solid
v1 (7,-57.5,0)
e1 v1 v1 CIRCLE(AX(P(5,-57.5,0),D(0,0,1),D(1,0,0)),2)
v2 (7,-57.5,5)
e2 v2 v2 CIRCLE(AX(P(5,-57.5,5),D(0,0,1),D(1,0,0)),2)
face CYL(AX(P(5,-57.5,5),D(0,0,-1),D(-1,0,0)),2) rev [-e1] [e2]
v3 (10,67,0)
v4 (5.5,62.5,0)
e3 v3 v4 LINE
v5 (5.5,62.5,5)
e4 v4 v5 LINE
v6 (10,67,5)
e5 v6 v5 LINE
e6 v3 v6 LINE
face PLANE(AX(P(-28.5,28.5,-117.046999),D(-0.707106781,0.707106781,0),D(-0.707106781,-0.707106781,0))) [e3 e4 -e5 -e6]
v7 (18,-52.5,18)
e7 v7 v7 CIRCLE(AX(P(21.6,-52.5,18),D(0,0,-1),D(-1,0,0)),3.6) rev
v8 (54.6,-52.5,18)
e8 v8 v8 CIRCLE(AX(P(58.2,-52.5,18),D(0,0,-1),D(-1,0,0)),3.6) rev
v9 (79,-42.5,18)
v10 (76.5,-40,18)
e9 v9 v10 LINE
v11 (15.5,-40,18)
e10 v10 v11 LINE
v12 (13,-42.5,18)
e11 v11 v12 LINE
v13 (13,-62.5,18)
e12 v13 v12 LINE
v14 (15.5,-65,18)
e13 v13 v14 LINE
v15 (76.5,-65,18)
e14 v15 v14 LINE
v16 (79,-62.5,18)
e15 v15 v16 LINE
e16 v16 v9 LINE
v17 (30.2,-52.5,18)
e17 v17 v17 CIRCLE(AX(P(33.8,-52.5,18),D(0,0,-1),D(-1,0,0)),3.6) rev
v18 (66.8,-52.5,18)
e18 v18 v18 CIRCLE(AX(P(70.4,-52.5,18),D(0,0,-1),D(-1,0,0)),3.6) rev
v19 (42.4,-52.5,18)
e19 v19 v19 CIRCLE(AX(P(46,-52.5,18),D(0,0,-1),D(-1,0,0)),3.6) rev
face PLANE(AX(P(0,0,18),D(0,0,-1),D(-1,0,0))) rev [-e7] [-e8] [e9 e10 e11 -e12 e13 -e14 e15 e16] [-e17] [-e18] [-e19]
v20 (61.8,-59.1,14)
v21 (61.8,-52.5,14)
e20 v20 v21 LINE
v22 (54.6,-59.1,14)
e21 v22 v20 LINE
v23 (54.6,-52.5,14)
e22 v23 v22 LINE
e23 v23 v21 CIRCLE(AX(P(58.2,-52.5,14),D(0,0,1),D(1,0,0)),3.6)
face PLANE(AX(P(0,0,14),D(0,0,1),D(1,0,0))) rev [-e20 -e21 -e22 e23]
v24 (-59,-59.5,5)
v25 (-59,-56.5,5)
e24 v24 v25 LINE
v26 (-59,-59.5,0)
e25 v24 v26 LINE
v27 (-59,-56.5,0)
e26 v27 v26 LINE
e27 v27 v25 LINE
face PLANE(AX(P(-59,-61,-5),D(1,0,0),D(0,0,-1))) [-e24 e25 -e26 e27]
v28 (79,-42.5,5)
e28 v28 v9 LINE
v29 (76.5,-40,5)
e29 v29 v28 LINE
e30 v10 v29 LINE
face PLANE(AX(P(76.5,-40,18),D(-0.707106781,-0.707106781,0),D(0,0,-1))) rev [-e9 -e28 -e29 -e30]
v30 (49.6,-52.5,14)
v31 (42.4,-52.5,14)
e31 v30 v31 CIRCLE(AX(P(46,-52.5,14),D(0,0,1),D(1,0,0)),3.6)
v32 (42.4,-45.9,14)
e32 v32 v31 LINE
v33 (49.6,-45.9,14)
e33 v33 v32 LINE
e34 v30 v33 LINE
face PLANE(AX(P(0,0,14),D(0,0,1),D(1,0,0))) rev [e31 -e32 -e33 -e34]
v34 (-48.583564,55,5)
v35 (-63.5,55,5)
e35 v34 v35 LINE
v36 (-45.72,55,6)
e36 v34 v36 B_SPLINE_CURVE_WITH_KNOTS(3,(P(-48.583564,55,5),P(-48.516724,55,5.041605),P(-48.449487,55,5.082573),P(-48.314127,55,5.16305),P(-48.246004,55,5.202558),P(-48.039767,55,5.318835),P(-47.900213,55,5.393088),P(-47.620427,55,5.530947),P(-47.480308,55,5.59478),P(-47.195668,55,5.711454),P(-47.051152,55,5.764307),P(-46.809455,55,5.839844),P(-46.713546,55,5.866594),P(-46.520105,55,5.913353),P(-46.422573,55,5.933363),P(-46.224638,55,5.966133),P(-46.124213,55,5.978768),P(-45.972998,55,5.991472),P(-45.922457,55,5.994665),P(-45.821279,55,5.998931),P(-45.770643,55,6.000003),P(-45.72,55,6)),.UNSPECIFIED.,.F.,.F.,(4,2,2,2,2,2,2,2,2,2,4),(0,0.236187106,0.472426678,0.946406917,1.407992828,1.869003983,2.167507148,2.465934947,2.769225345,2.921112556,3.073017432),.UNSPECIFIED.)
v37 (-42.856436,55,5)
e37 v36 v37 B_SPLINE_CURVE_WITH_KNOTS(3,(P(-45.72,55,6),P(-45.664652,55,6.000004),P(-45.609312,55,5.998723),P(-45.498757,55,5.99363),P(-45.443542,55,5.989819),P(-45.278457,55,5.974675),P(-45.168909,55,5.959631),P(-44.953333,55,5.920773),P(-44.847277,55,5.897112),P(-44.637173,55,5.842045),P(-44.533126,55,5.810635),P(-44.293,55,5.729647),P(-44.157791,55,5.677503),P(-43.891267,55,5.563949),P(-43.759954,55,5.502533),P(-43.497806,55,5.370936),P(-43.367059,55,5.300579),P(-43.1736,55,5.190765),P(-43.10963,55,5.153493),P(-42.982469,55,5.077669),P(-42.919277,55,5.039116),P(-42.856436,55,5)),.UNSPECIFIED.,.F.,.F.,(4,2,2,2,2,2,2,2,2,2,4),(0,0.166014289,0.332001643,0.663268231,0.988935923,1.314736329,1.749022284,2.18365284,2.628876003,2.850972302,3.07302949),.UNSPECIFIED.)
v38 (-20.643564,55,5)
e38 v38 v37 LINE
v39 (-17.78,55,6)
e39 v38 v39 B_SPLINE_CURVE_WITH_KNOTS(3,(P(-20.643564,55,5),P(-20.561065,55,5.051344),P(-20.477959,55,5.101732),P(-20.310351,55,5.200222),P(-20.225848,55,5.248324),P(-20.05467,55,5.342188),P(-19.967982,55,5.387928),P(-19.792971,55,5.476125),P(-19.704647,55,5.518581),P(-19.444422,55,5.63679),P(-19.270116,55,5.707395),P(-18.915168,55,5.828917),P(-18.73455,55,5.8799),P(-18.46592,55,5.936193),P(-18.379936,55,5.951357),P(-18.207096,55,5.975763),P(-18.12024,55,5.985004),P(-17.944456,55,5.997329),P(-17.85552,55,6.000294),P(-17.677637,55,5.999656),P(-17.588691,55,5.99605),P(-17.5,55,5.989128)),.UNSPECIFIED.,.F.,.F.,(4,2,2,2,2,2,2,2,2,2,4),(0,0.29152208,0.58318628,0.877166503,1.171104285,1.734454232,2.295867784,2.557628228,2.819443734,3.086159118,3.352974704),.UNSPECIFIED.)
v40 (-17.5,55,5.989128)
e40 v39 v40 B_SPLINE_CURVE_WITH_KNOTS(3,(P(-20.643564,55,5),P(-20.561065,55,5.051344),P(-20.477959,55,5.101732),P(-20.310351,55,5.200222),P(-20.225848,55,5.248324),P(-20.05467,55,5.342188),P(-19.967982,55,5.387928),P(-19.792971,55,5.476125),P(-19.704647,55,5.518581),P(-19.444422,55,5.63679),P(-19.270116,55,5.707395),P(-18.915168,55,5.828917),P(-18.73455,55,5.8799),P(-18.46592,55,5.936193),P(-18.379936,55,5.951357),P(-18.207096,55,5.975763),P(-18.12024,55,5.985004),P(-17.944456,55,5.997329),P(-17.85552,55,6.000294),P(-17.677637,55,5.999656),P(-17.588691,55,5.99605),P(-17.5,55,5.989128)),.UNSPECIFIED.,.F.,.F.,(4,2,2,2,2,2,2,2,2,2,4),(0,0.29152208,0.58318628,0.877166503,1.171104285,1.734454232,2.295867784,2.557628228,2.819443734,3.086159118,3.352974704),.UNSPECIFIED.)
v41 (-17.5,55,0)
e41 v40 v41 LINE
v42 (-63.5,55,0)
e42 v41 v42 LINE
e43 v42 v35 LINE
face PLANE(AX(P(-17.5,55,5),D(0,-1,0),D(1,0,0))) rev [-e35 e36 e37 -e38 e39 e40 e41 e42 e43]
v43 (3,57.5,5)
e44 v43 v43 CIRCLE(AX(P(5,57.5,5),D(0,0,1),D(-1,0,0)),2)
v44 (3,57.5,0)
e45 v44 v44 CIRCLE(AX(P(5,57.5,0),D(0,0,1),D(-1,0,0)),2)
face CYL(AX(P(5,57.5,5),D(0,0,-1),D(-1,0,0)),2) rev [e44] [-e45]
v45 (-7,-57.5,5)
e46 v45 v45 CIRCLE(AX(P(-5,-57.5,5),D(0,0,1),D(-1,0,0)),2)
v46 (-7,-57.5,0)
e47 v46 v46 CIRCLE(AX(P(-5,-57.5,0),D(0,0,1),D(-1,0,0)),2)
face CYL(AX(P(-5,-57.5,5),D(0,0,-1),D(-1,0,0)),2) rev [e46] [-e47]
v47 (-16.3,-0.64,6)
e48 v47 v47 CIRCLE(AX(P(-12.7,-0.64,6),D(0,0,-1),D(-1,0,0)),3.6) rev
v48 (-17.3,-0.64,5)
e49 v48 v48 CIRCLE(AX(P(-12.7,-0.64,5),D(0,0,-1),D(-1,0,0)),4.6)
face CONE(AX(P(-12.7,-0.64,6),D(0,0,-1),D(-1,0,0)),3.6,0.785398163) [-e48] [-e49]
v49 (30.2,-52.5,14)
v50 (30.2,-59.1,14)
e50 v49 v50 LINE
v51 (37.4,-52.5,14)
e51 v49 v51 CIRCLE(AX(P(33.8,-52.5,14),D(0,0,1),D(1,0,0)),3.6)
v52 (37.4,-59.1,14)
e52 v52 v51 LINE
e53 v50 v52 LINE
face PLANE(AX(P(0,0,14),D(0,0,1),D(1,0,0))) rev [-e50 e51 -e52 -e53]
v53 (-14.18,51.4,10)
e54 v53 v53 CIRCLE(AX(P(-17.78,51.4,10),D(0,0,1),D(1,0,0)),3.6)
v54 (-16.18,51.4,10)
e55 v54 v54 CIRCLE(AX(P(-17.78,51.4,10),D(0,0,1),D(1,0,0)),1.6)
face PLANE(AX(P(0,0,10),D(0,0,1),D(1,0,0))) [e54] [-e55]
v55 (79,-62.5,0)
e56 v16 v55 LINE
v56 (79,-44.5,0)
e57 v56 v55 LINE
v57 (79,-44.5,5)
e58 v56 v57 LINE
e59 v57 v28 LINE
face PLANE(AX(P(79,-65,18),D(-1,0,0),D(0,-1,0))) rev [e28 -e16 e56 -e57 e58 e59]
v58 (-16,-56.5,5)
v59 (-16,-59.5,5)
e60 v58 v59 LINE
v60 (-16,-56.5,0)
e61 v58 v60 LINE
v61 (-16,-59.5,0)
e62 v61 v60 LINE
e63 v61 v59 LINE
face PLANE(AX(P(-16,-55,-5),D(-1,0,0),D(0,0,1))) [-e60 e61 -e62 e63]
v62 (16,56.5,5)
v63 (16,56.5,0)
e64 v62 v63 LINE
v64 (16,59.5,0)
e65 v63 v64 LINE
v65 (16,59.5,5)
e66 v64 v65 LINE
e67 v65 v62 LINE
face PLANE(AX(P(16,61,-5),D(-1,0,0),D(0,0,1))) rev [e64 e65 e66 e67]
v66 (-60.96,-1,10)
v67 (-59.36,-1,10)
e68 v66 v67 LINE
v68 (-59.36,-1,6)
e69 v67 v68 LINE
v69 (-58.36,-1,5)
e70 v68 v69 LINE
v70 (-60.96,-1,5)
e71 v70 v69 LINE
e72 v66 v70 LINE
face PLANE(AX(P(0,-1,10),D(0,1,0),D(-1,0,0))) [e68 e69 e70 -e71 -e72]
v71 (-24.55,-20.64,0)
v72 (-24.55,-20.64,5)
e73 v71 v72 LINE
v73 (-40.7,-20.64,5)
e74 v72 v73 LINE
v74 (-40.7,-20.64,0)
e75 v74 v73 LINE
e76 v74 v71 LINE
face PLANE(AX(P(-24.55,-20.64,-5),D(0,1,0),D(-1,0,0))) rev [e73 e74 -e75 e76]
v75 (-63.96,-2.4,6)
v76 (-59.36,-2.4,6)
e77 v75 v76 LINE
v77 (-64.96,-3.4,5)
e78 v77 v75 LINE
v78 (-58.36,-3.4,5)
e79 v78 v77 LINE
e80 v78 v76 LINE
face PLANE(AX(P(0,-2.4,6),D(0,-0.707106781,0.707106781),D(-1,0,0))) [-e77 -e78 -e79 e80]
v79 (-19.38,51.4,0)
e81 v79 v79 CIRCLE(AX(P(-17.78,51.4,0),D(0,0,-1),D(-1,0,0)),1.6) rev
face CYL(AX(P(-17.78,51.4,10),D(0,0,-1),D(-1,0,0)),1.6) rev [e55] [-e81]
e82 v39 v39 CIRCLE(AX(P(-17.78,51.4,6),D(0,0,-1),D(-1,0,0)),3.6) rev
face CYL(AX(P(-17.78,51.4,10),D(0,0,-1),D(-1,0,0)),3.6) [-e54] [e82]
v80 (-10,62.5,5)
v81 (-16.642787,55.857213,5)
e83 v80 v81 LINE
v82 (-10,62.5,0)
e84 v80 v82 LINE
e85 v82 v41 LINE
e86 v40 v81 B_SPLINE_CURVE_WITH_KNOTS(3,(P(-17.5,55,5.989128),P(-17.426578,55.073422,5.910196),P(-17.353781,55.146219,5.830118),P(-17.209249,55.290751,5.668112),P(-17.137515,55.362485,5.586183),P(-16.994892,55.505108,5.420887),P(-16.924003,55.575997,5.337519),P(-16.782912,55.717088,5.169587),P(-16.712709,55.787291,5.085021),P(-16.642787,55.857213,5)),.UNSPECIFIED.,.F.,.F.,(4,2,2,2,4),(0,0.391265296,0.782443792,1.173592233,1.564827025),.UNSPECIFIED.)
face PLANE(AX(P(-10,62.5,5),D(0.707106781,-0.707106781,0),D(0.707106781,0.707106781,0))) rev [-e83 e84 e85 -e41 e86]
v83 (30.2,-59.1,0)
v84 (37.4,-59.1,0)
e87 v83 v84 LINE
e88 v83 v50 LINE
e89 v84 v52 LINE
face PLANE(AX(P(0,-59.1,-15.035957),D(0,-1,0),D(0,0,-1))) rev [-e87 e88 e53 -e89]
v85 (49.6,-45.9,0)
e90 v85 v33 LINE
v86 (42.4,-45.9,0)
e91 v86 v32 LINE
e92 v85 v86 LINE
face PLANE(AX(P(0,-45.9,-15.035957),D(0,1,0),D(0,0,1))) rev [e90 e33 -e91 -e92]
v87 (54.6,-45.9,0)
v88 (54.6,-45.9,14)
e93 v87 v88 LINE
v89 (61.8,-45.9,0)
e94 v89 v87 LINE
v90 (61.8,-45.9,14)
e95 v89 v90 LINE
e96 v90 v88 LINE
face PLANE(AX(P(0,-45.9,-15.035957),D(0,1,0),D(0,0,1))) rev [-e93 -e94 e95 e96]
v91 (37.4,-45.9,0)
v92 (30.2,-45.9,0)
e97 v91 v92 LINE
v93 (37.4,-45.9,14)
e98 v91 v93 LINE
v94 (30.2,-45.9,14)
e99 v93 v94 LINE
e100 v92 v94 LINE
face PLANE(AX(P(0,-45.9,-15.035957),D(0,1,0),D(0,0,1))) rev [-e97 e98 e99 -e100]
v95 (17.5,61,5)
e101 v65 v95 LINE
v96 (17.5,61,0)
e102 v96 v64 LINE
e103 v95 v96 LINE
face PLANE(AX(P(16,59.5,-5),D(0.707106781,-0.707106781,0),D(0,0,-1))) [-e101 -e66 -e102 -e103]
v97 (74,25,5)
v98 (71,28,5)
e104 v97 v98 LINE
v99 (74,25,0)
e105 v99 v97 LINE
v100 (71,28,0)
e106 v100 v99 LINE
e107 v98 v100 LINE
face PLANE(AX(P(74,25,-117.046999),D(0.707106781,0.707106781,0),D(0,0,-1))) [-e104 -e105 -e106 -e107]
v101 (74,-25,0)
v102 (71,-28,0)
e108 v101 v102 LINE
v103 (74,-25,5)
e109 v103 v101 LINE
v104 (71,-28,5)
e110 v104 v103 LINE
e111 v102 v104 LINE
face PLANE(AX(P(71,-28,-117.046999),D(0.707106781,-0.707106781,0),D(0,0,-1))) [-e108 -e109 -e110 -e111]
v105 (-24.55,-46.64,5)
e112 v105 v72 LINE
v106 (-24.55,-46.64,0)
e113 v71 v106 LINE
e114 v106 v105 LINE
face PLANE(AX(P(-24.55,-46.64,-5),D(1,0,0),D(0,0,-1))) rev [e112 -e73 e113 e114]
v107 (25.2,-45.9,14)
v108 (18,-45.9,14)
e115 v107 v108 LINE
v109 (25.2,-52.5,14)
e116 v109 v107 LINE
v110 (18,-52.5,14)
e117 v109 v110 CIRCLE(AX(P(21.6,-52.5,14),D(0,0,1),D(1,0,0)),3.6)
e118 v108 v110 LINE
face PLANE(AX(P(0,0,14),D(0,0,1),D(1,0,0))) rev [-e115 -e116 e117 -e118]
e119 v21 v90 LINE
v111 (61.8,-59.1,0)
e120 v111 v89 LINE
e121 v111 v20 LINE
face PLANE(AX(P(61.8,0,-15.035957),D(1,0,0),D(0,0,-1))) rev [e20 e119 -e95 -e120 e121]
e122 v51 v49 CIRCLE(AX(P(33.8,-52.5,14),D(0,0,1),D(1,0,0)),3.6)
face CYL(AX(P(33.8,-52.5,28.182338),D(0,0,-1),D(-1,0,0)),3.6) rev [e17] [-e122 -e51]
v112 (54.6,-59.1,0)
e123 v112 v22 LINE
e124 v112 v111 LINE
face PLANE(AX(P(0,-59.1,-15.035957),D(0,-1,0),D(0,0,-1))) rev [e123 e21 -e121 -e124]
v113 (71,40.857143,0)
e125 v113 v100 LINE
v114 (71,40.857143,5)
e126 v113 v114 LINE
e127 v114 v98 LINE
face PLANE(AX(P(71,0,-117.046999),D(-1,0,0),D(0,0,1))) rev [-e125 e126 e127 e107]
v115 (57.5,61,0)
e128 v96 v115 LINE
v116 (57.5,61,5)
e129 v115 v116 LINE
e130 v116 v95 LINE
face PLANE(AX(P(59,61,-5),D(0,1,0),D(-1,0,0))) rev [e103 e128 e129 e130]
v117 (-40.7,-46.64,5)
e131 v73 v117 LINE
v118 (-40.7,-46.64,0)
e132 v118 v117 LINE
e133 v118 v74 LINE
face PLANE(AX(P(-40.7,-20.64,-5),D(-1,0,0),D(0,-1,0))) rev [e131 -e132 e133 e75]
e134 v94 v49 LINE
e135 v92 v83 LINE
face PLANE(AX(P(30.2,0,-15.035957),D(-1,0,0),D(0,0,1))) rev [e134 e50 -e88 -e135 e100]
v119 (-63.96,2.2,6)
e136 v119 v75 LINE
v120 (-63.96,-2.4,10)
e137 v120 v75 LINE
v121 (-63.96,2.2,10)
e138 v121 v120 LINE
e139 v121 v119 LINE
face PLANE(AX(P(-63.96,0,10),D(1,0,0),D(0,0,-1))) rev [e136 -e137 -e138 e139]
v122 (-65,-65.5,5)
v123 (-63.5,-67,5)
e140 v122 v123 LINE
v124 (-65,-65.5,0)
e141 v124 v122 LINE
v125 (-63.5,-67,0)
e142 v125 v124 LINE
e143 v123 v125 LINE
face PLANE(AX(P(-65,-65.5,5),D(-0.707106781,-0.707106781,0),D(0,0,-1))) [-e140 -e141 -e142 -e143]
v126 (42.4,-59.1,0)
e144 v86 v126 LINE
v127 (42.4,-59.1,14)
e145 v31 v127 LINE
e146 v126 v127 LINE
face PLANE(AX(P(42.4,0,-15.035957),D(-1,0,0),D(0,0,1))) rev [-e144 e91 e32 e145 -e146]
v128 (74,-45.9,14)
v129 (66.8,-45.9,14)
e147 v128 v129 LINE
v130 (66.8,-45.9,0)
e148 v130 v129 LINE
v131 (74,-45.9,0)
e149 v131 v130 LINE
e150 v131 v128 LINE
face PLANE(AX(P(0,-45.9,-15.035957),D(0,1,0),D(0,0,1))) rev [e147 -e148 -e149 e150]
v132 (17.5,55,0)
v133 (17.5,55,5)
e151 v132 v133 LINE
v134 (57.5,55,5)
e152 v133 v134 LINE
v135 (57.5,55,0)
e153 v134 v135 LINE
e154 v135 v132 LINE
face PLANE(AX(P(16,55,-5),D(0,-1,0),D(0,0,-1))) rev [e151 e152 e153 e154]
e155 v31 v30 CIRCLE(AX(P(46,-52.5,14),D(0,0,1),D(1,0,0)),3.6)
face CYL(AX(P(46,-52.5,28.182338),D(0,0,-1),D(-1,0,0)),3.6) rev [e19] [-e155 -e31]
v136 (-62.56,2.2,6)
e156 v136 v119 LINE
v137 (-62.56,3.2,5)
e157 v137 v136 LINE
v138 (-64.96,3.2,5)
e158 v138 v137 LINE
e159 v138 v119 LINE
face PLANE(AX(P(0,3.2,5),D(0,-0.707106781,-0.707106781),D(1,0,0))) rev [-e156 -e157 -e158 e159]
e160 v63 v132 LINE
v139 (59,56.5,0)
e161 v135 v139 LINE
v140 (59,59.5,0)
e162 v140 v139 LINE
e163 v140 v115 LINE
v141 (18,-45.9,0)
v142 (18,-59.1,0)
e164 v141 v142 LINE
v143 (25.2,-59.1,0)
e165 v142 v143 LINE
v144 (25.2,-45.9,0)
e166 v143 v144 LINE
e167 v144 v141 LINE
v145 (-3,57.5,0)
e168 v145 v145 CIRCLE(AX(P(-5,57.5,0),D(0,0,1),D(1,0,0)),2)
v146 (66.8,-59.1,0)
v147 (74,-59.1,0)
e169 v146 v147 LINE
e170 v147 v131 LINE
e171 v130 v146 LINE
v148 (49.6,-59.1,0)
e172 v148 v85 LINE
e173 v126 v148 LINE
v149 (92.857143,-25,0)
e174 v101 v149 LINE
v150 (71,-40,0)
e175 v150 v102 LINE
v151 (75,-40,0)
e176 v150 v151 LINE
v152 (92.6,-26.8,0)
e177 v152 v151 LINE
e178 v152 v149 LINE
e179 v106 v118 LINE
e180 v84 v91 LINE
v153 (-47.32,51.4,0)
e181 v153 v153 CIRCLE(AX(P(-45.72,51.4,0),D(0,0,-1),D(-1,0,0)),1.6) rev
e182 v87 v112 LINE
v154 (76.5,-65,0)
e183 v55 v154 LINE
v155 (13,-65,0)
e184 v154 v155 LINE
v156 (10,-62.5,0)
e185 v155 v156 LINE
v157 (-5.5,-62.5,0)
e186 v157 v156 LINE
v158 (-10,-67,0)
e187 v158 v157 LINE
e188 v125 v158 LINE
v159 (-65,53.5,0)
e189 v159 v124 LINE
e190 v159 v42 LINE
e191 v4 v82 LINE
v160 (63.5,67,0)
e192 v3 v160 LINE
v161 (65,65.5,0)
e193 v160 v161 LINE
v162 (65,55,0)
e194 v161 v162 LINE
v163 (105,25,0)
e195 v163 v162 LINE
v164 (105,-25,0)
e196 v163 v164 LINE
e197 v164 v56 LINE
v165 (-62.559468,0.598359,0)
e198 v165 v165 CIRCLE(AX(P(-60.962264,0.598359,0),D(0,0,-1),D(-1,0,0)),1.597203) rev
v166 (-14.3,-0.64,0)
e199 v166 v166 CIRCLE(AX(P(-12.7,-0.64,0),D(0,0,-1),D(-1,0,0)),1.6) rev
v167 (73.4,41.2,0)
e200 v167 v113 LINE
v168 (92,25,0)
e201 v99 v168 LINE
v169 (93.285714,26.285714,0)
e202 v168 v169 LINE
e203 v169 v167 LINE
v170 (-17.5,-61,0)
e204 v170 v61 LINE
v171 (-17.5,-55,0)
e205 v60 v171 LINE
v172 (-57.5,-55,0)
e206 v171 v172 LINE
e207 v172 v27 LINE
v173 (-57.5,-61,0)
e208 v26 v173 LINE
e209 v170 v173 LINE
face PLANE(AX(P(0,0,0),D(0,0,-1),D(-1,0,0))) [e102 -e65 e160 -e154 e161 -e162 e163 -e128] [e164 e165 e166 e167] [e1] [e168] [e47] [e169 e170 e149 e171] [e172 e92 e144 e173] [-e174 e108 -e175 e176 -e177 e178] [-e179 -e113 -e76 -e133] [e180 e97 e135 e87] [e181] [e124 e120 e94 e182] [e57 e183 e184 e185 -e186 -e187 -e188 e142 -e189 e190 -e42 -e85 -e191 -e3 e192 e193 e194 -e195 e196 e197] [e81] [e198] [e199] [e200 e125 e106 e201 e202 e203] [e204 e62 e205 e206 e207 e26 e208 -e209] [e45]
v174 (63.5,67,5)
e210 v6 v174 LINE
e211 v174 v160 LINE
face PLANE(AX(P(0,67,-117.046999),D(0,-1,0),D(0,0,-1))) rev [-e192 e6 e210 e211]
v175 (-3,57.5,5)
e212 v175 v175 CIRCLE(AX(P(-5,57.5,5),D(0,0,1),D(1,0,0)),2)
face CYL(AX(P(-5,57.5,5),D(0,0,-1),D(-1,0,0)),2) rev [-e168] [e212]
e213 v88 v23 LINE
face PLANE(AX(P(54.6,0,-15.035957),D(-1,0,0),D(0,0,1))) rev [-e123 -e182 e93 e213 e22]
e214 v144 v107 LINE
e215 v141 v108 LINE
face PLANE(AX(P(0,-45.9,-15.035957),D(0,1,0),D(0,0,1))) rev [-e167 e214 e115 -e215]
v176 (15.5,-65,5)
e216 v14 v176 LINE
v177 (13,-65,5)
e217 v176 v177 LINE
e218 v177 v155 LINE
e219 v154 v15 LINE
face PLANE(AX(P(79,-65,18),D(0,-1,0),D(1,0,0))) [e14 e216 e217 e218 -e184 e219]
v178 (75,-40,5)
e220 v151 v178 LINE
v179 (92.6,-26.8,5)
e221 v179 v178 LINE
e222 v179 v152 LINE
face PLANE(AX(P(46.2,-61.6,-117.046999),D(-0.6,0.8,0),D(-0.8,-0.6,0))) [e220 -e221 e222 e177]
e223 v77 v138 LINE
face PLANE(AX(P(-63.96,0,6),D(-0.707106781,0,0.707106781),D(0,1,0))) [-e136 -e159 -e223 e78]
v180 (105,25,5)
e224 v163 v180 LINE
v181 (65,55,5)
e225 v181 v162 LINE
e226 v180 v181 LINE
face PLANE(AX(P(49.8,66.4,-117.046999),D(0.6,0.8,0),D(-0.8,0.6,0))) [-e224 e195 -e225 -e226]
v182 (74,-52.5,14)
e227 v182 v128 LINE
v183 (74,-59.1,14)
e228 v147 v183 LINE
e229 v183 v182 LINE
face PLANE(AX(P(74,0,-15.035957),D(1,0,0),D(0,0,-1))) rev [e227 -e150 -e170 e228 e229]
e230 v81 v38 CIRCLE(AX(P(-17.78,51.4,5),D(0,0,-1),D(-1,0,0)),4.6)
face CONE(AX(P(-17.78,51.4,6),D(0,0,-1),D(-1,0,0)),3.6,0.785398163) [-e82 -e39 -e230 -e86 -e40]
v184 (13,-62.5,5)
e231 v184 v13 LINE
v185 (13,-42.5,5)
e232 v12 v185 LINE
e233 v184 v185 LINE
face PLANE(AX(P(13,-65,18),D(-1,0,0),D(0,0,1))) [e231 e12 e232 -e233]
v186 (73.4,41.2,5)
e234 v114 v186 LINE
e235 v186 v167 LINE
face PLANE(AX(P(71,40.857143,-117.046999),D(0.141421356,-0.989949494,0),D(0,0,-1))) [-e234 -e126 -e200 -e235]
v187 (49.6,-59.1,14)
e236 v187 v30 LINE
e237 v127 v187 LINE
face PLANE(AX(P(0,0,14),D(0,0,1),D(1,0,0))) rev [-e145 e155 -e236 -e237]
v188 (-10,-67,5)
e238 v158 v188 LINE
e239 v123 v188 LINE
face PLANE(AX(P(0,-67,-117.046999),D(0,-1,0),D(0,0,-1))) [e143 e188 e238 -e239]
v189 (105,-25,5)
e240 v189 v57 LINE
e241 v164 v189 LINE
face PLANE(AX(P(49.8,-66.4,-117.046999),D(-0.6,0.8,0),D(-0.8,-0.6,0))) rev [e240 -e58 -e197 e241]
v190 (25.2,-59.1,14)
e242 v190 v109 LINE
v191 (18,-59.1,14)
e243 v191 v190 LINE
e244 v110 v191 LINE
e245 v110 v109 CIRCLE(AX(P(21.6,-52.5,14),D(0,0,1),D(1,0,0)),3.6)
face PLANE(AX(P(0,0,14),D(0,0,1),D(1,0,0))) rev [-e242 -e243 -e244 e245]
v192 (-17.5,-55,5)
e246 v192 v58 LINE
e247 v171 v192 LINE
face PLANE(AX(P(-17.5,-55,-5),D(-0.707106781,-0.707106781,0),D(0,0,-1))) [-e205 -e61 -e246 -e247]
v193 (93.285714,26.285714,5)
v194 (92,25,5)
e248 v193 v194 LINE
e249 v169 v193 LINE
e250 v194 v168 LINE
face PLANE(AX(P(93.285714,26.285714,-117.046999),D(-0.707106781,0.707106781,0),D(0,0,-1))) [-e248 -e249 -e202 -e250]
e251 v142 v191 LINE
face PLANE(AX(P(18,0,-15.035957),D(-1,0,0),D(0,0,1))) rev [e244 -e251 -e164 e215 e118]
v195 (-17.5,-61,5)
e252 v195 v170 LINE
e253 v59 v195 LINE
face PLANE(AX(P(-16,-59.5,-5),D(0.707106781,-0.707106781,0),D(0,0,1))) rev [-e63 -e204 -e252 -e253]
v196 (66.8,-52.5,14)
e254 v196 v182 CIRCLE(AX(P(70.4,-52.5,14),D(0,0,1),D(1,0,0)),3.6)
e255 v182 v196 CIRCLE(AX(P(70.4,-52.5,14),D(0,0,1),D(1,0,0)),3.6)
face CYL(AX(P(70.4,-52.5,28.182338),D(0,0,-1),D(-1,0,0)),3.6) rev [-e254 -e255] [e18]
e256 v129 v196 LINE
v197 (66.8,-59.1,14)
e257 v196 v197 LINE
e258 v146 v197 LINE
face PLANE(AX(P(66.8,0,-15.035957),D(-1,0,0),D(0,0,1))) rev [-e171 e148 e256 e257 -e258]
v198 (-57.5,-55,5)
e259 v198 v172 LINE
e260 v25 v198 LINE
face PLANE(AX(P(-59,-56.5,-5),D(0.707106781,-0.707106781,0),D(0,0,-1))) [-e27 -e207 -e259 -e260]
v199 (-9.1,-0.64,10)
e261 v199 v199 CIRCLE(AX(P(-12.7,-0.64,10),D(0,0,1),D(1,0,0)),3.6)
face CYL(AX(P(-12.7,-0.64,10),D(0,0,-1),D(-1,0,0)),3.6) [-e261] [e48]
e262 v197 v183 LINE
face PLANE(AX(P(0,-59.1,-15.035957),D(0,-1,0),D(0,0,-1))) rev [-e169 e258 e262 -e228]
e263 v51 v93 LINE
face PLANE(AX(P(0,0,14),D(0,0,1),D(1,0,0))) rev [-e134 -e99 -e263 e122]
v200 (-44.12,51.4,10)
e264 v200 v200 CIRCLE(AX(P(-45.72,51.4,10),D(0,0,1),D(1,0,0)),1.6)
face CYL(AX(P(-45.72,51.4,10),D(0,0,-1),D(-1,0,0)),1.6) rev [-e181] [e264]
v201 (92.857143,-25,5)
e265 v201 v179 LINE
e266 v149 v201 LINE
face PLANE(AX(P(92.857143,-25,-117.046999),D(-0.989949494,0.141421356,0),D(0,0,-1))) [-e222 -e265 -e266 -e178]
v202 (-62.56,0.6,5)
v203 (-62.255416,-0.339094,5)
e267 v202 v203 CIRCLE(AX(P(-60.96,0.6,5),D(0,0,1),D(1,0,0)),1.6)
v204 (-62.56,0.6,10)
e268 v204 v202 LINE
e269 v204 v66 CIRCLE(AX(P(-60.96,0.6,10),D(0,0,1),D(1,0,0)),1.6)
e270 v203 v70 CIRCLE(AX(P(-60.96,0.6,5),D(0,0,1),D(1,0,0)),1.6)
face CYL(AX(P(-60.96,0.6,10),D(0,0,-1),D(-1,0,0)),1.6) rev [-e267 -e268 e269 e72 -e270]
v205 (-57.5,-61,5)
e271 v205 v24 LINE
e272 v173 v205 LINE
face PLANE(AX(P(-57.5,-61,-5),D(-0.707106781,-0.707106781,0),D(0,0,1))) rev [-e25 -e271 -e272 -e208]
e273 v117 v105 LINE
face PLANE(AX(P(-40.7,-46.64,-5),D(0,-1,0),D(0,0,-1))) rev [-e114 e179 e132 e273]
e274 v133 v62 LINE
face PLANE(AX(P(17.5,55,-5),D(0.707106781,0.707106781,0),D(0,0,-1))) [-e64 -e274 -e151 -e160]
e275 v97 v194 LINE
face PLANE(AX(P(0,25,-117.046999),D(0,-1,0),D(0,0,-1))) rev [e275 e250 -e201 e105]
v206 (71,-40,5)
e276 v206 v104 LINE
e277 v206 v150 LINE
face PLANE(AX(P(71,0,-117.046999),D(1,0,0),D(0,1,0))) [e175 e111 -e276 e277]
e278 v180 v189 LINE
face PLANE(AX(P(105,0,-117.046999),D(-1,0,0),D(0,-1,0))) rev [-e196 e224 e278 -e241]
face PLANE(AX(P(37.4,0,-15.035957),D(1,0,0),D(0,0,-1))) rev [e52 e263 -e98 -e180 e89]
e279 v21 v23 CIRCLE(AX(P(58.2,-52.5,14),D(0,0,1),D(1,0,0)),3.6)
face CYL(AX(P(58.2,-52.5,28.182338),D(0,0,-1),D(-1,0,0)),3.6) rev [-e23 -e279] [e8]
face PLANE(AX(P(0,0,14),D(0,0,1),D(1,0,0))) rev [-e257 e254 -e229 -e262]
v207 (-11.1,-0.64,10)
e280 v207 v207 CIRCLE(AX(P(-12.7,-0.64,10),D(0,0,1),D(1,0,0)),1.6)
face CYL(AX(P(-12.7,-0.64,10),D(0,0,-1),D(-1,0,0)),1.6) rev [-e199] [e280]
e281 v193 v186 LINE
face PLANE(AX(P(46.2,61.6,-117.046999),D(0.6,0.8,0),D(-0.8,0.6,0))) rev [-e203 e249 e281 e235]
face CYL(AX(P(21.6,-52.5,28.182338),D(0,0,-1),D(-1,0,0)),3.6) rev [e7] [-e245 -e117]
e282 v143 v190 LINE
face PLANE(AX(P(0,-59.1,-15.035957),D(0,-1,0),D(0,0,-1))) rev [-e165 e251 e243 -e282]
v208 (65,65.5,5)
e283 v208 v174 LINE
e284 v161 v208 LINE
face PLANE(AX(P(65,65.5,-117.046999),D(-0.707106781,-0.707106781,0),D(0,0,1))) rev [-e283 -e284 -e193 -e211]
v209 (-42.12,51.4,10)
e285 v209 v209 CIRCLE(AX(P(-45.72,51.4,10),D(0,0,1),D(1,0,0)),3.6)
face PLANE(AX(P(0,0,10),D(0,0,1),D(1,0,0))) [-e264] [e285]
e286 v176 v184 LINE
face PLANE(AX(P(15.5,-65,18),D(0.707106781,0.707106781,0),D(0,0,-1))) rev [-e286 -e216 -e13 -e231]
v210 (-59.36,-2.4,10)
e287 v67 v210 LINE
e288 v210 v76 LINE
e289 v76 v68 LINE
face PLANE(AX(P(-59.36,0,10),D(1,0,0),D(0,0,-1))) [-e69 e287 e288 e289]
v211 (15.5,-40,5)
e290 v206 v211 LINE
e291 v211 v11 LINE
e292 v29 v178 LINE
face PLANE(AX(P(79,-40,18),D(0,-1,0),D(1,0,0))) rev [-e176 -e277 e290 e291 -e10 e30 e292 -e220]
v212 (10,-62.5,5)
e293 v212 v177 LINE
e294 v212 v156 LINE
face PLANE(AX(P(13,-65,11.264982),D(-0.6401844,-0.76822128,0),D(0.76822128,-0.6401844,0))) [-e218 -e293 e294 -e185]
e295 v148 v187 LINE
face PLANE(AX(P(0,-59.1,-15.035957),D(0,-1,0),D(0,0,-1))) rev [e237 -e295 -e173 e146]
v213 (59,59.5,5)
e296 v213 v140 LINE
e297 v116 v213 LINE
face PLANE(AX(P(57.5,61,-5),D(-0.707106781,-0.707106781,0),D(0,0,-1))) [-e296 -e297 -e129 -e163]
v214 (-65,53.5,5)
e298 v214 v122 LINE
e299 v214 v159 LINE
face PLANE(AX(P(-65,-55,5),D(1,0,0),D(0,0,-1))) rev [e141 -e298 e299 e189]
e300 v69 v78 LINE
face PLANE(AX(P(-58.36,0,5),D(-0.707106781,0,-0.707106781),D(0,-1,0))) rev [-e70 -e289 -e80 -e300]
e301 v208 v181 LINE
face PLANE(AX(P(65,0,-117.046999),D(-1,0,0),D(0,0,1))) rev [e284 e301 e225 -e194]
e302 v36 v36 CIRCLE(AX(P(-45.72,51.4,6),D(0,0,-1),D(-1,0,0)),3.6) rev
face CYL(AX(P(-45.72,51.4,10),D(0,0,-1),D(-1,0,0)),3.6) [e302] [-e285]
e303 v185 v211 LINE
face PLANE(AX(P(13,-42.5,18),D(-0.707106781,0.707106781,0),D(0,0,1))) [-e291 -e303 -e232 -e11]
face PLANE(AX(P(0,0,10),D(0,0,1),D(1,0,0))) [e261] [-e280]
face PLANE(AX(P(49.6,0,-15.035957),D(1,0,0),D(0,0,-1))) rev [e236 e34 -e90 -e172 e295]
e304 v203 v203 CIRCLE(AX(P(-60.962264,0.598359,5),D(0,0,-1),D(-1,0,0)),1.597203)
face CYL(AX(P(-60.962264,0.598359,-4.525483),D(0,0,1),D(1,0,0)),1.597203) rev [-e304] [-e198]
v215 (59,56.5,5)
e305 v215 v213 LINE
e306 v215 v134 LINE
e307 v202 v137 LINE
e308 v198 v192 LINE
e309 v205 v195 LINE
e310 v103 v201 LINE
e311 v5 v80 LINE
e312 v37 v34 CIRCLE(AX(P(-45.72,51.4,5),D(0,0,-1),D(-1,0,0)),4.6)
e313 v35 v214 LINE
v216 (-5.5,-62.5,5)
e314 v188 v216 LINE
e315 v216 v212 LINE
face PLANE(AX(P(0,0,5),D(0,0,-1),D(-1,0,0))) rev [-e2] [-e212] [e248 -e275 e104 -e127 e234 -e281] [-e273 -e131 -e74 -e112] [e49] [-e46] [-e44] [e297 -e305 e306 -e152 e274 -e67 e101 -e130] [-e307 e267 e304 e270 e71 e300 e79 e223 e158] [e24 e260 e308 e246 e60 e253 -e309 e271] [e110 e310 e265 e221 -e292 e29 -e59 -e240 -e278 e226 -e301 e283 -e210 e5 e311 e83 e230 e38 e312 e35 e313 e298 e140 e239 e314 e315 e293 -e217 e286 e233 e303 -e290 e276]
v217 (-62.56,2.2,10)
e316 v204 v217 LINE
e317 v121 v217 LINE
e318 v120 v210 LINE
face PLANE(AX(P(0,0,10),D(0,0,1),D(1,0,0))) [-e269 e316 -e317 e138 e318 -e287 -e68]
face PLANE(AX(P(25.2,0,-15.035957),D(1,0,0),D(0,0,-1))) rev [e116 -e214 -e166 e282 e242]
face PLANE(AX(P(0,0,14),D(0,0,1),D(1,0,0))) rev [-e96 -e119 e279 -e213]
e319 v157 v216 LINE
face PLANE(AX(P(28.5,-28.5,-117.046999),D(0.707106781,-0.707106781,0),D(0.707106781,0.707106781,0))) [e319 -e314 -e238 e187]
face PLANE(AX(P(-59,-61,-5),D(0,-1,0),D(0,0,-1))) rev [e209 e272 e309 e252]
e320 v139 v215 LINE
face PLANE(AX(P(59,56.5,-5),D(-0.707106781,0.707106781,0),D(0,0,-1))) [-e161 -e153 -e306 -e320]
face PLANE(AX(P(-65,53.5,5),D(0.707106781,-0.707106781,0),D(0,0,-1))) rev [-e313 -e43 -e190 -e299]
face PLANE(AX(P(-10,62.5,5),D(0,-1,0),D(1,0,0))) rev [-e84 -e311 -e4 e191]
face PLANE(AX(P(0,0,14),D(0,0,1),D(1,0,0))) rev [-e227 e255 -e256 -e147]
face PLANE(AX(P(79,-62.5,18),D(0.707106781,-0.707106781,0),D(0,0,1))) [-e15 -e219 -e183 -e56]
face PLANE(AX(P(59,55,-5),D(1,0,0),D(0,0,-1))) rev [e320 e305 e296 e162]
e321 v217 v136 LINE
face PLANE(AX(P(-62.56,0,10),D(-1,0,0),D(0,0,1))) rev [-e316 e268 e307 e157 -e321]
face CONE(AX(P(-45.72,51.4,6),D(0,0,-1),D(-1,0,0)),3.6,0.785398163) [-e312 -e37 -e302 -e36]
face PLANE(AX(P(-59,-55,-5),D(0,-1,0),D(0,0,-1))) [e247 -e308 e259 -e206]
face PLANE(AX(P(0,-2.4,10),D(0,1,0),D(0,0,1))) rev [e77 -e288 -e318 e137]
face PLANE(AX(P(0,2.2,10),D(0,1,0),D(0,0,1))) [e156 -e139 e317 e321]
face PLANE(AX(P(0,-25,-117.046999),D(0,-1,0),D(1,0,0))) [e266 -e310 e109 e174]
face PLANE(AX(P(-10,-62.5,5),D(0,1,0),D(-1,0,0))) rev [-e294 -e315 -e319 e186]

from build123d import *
from OCP.BRepFilletAPI import BRepFilletAPI_MakeChamfer

# Parameters (mm, degrees)
SKETCH1_R           = 2
BOSS_EXTRUDE1_DEPTH = 5
SKETCH4_R           = 3.6
SKETCH4_R_2         = 1.6
BOSS_EXTRUDE2_DEPTH = 5
CUT_EXTRUDE1_START  = -10
SKETCH5_R           = 1.6
SKETCH5_R_2         = 1.5972034
CUT_EXTRUDE1_DEPTH  = 10
CHAMFER1_SIZE       = 1
SKETCH6_W           = 16.15
SKETCH6_H           = 26
CUT_EXTRUDE2_DEPTH  = 10
BOSS_EXTRUDE3_DEPTH = 5
CHAMFER3_SIZE       = 3
CHAMFER3_SIZE2      = 2.142857143
SKETCH10_W          = 43
SKETCH10_H          = 6
CUT_EXTRUDE3_DEPTH  = 10
CHAMFER4_SIZE       = 1.5
SKETCH11_W          = 66
SKETCH11_H          = 25
BOSS_EXTRUDE4_DEPTH = 13
SKETCH12_W          = 66
SKETCH12_H          = 25
BOSS_EXTRUDE5_DEPTH = 5
CUT_EXTRUDE4_START  = -4
SKETCH13_W          = 7.2
SKETCH13_H          = 13.2
CUT_EXTRUDE4_DEPTH  = 14
SKETCH15_R          = 3.6
CUT_EXTRUDE6_DEPTH  = 18
BOSS_EXTRUDE6_DEPTH = 5
CHAMFER5_SIZE       = 2.5


with BuildPart() as part:
    # Sketch1 → Boss-Extrude1 (new body)
    with BuildSketch(Plane.XY):
        Polygon((65, -55), (17.5, -55), (10, -62.5), (-10, -62.5), (-17.5, -55), (-65, -55), (-65, 55), (-17.5, 55), (-10, 62.5), (10, 62.5), (17.5, 55), (65, 55), align=None)
        with Locations((-5, 57.5)):
            Circle(SKETCH1_R, mode=Mode.SUBTRACT)
        with Locations(Location((5, 57.5, 0), (0, 0, 180))):
            Circle(SKETCH1_R, mode=Mode.SUBTRACT)
        with Locations((5, -57.5)):
            Circle(SKETCH1_R, mode=Mode.SUBTRACT)
        with Locations(Location((-5, -57.5, 0), (0, 0, 180))):
            Circle(SKETCH1_R, mode=Mode.SUBTRACT)
    extrude(amount=BOSS_EXTRUDE1_DEPTH)

    # Sketch4 → Boss-Extrude2 (add)
    # profile 1 of 4: a face of its own
    with BuildSketch(Plane.XY.offset(5)):
        with BuildLine():
            Line((-62.56, 2.2), (-63.96, 2.2))
            Line((-63.96, 2.2), (-63.96, -2.4))
            Line((-63.96, -2.4), (-59.36, -2.4))
            Line((-59.36, -2.4), (-59.36, -1))
            Line((-59.36, -1), (-60.96, -1))
            ThreePointArc((-60.96, -1), (-62.09137085, -0.53137085), (-62.56, 0.6))
            Line((-62.56, 0.6), (-62.56, 2.2))
        make_face()
    # profile 2 of 4: a face of its own
    with BuildSketch(Plane.XY.offset(5)):
        with Locations(Location((-12.7, -0.64, 0), (0, 0, 180))):
            Circle(SKETCH4_R)
        with Locations((-12.7, -0.64)):
            Circle(SKETCH4_R_2, mode=Mode.SUBTRACT)
    # profile 3 of 4: a face of its own
    with BuildSketch(Plane.XY.offset(5)):
        with Locations(Location((-17.78, 51.4, 0), (0, 0, 90))):
            Circle(SKETCH4_R)
        with Locations((-17.78, 51.4)):
            Circle(SKETCH4_R_2, mode=Mode.SUBTRACT)
    # profile 4 of 4: a face of its own
    with BuildSketch(Plane.XY.offset(5)):
        with Locations(Location((-45.72, 51.4, 0), (0, 0, 90))):
            Circle(SKETCH4_R)
        with Locations((-45.72, 51.4)):
            Circle(SKETCH4_R_2, mode=Mode.SUBTRACT)
    extrude(amount=BOSS_EXTRUDE2_DEPTH)

    # Sketch5 → Cut-Extrude1 (cut)
    with BuildSketch(Plane.XY.offset(10).offset(CUT_EXTRUDE1_START)):
        with Locations(Location((-45.72, 51.4, 0), (0, 0, 180))):
            Circle(SKETCH5_R)
        with Locations(Location((-17.78, 51.4, 0), (0, 0, 180))):
            Circle(SKETCH5_R)
        with Locations(Location((-12.7, -0.64, 0), (0, 0, 180))):
            Circle(SKETCH5_R)
        with Locations(Location((-60.962264225, 0.59835858, 0), (0, 0, 215.939730973))):
            Circle(SKETCH5_R_2)
    extrude(amount=CUT_EXTRUDE1_DEPTH, mode=Mode.SUBTRACT)

    # Chamfer1
    # the kernel refuses this chamfer: 1 mm, written as the material it adds along each edge
    with BuildSketch(Plane(origin=(-63.96, 2.2, 5), x_dir=(-0.9996219169112968, 0, -0.027495876610586795), z_dir=(0, -1, 0)), Plane(origin=(-63.96, -2.4, 5), x_dir=(0, -0.9996219169112968, -0.027495876610586487), z_dir=(1, 0, 0))) as chamfer1_piece_1:
        Polygon((CHAMFER1_SIZE * 0.999621916911, -CHAMFER1_SIZE * 0.0274958766106), (-CHAMFER1_SIZE * 0.0274958766106, -CHAMFER1_SIZE * 0.999621916911), (0, 0), align=None)
    extrude(amount=4.6)
    with BuildSketch(Plane(origin=(-59.36, -2.4, 5), x_dir=(0.9996219169112968, 0, -0.027495876610586414), z_dir=(0, 1, 0)), Plane(origin=(-62.56, 2.2, 5), x_dir=(0, 0.9996219169112968, -0.027495876610586487), z_dir=(-1, 0, 0))) as chamfer1_piece_2:
        Polygon((CHAMFER1_SIZE * 0.999621916911, -CHAMFER1_SIZE * 0.0274958766106), (-CHAMFER1_SIZE * 0.0274958766106, -CHAMFER1_SIZE * 0.999621916911), (0, 0), align=None)
    extrude(amount=1.4)
    with BuildSketch(Plane(origin=(-12.7, -0.64, 5), x_dir=(-1, 0, 0), z_dir=(0, 1, 0))) as chamfer1_piece_3:
        Polygon((3.6 + CHAMFER1_SIZE, 0), (3.6, CHAMFER1_SIZE), (3.6, 0), align=None)
    revolve(axis=Axis((-12.7, -0.64, 5), (0, 0, 1)))
    with BuildSketch(Plane(origin=(-17.78, 51.4, 5), x_dir=(0, 1, 0), z_dir=(1, 0, 0))) as chamfer1_piece_4_section:
        Polygon((3.6 + CHAMFER1_SIZE, 0), (3.6, CHAMFER1_SIZE), (3.6, 0), align=None)
    chamfer1_piece_4 = revolve(axis=Axis((-17.78, 51.4, 5), (0, 0, 1)), mode=Mode.PRIVATE)
    chamfer1_piece_4 = split(chamfer1_piece_4, bisect_by=Plane(origin=(-20.090607532, 52.409392468, 5.333813393), z_dir=(-0.7071067811865521, 0.707106781186543, 0)), keep=Keep.TOP, mode=Mode.PRIVATE)
    chamfer1_piece_4 = split(chamfer1_piece_4, bisect_by=Plane(origin=(-20.897674884, 55, 5.333813393), z_dir=(0, -1, 0)), keep=Keep.TOP, mode=Mode.PRIVATE)
    add(chamfer1_piece_4)
    with BuildSketch(Plane(origin=(-17.78, 51.4, 5), x_dir=(0, 1, 0), z_dir=(1, 0, 0))) as chamfer1_piece_5_section:
        Polygon((3.6 + CHAMFER1_SIZE, 0), (3.6, CHAMFER1_SIZE), (3.6, 0), align=None)
    chamfer1_piece_5 = revolve(axis=Axis((-17.78, 51.4, 5), (0, 0, 1)), mode=Mode.PRIVATE)
    chamfer1_piece_5 = split(chamfer1_piece_5, bisect_by=Plane(origin=(-16.893463723, 55.606536277, 5.257332972), z_dir=(0.7071067811865521, -0.707106781186543, 0)), keep=Keep.TOP, mode=Mode.PRIVATE)
    chamfer1_piece_5 = split(chamfer1_piece_5, bisect_by=Plane(origin=(-16.518343034, 55, 5.257332972), z_dir=(0, 1, 0)), keep=Keep.TOP, mode=Mode.PRIVATE)
    add(chamfer1_piece_5)
    with BuildSketch(Plane(origin=(-17.78, 51.4, 5), x_dir=(0, 1, 0), z_dir=(1, 0, 0))) as chamfer1_piece_6_section:
        Polygon((3.6 + CHAMFER1_SIZE, 0), (3.6, CHAMFER1_SIZE), (3.6, 0), align=None)
    chamfer1_piece_6 = revolve(axis=Axis((-17.78, 51.4, 5), (0, 0, 1)), mode=Mode.PRIVATE)
    chamfer1_piece_6 = split(chamfer1_piece_6, bisect_by=Plane(origin=(-19.44, 53.06, 5.485263694), z_dir=(0.7071067811865521, -0.707106781186543, 0)), keep=Keep.TOP, mode=Mode.PRIVATE)
    chamfer1_piece_6 = split(chamfer1_piece_6, bisect_by=Plane(origin=(-14.891282339, 55, 5.485263694), z_dir=(0, -1, 0)), keep=Keep.TOP, mode=Mode.PRIVATE)
    add(chamfer1_piece_6)
    with BuildSketch(Plane(origin=(-45.72, 51.4, 5), x_dir=(0, 1, 0), z_dir=(1, 0, 0))) as chamfer1_piece_7_section:
        Polygon((3.6 + CHAMFER1_SIZE, 0), (3.6, CHAMFER1_SIZE), (3.6, 0), align=None)
    chamfer1_piece_7 = revolve(axis=Axis((-45.72, 51.4, 5), (0, 0, 1)), mode=Mode.PRIVATE)
    chamfer1_piece_7 = split(chamfer1_piece_7, bisect_by=Plane(origin=(-45.72, 55, 5.483834366), z_dir=(0, -1, 0)), keep=Keep.TOP, mode=Mode.PRIVATE)
    add(chamfer1_piece_7)
    with BuildSketch(Plane(origin=(-63.96, 4.771682988, 5), x_dir=(-0.9996219169112968, 0, -0.027495876610586795), z_dir=(0, -1, 0))) as chamfer1_piece_8a_section:
        Polygon((CHAMFER1_SIZE * 0.999621916911, -CHAMFER1_SIZE * 0.0274958766106), (-CHAMFER1_SIZE * 0.0274958766106, -CHAMFER1_SIZE * 0.999621916911), (0, 0), align=None)
    chamfer1_piece_8a = extrude(amount=7.171682988, mode=Mode.PRIVATE)
    chamfer1_piece_8a = split(chamfer1_piece_8a, bisect_by=Plane(origin=(-64.289793627, 2.2, 5.329793627), z_dir=(0, 1, 0)), keep=Keep.TOP, mode=Mode.PRIVATE)
    with BuildSketch(Plane(origin=(-62.56, 2.2, 5), x_dir=(0, 0.9996219169112968, -0.027495876610586487), z_dir=(-1, 0, 0))) as chamfer1_piece_8b_section:
        Polygon((CHAMFER1_SIZE * 0.999621916911, -CHAMFER1_SIZE * 0.0274958766106), (-CHAMFER1_SIZE * 0.0274958766106, -CHAMFER1_SIZE * 0.999621916911), (0, 0), align=None)
    chamfer1_piece_8b = extrude(amount=3.971682988, mode=Mode.PRIVATE)
    chamfer1_piece_8b = split(chamfer1_piece_8b, bisect_by=Plane(origin=(-65, 2.529793627, 5.329793627), z_dir=(1, 0, 0)), keep=Keep.TOP, mode=Mode.PRIVATE)
    chamfer1_piece_8b = split(chamfer1_piece_8b, bisect_by=Plane(origin=(-63.96, 2.529793627, 5.329793627), z_dir=(-1, 0, 0)), keep=Keep.TOP, mode=Mode.PRIVATE)
    chamfer1_piece_8 = chamfer1_piece_8a & chamfer1_piece_8b
    add(chamfer1_piece_8)
    with BuildSketch(Plane(origin=(-66.531682988, -2.4, 5), x_dir=(0, -0.9996219169112968, -0.027495876610586487), z_dir=(1, 0, 0))) as chamfer1_piece_9a_section:
        Polygon((CHAMFER1_SIZE * 0.999621916911, -CHAMFER1_SIZE * 0.0274958766106), (-CHAMFER1_SIZE * 0.0274958766106, -CHAMFER1_SIZE * 0.999621916911), (0, 0), align=None)
    chamfer1_piece_9a = extrude(amount=7.171682988, mode=Mode.PRIVATE)
    chamfer1_piece_9a = split(chamfer1_piece_9a, bisect_by=Plane(origin=(-65, -2.729793627, 5.329793627), z_dir=(1, 0, 0)), keep=Keep.TOP, mode=Mode.PRIVATE)
    chamfer1_piece_9a = split(chamfer1_piece_9a, bisect_by=Plane(origin=(-63.96, -2.729793627, 5.329793627), z_dir=(-1, 0, 0)), keep=Keep.TOP, mode=Mode.PRIVATE)
    with BuildSketch(Plane(origin=(-63.96, 2.2, 5), x_dir=(-0.9996219169112968, 0, -0.027495876610586795), z_dir=(0, -1, 0))) as chamfer1_piece_9b_section:
        Polygon((CHAMFER1_SIZE * 0.999621916911, -CHAMFER1_SIZE * 0.0274958766106), (-CHAMFER1_SIZE * 0.0274958766106, -CHAMFER1_SIZE * 0.999621916911), (0, 0), align=None)
    chamfer1_piece_9b = extrude(amount=7.171682988, mode=Mode.PRIVATE)
    chamfer1_piece_9b = split(chamfer1_piece_9b, bisect_by=Plane(origin=(-64.289793627, -2.4, 5.329793627), z_dir=(0, -1, 0)), keep=Keep.TOP, mode=Mode.PRIVATE)
    chamfer1_piece_9 = chamfer1_piece_9a & chamfer1_piece_9b
    add(chamfer1_piece_9)
    with BuildSketch(Plane(origin=(-59.36, -4.971682988, 5), x_dir=(0.9996219169112968, 0, -0.027495876610586414), z_dir=(0, 1, 0))) as chamfer1_piece_10a_section:
        Polygon((CHAMFER1_SIZE * 0.999621916911, -CHAMFER1_SIZE * 0.0274958766106), (-CHAMFER1_SIZE * 0.0274958766106, -CHAMFER1_SIZE * 0.999621916911), (0, 0), align=None)
    chamfer1_piece_10a = extrude(amount=3.971682988, mode=Mode.PRIVATE)
    chamfer1_piece_10a = split(chamfer1_piece_10a, bisect_by=Plane(origin=(-59.030206373, -2.4, 5.329793627), z_dir=(0, -1, 0)), keep=Keep.TOP, mode=Mode.PRIVATE)
    with BuildSketch(Plane(origin=(-63.96, -2.4, 5), x_dir=(0, -0.9996219169112968, -0.027495876610586487), z_dir=(1, 0, 0))) as chamfer1_piece_10b_section:
        Polygon((CHAMFER1_SIZE * 0.999621916911, -CHAMFER1_SIZE * 0.0274958766106), (-CHAMFER1_SIZE * 0.0274958766106, -CHAMFER1_SIZE * 0.999621916911), (0, 0), align=None)
    chamfer1_piece_10b = extrude(amount=7.171682988, mode=Mode.PRIVATE)
    chamfer1_piece_10b = split(chamfer1_piece_10b, bisect_by=Plane(origin=(-59.36, -2.729793627, 5.329793627), z_dir=(1, 0, 0)), keep=Keep.TOP, mode=Mode.PRIVATE)
    chamfer1_piece_10 = chamfer1_piece_10a & chamfer1_piece_10b
    add(chamfer1_piece_10)

    # Sketch6 → Cut-Extrude2 (cut)
    with BuildSketch(Plane.XY.offset(5)):
        with Locations((-32.625, -33.64)):
            Rectangle(SKETCH6_W, SKETCH6_H)
    extrude(amount=-CUT_EXTRUDE2_DEPTH, mode=Mode.SUBTRACT)

    # Sketch9 → Boss-Extrude3 (add)
    # profile 1 of 3: a face of its own
    with BuildSketch(Plane.XY.offset(5)):
        Polygon((105, -25), (65, -55), (65, 55), (105, 25), align=None)
        Polygon((71, 43), (71, 25), (95, 25), align=None, mode=Mode.SUBTRACT)
        Polygon((71, -25), (95, -25), (71, -43), align=None, mode=Mode.SUBTRACT)
    # profile 2 of 3: a face of its own
    with BuildSketch(Plane.XY.offset(5)):
        Polygon((17.5, 55), (65, 55), (65, 67), (10, 67), (5.5, 62.5), (10, 62.5), align=None)
    # profile 3 of 3: a face of its own
    with BuildSketch(Plane.XY.offset(5)):
        Polygon((-17.5, -55), (-65, -55), (-65, -67), (-10, -67), (-5.5, -62.5), (-10, -62.5), align=None)
    extrude(amount=-BOSS_EXTRUDE3_DEPTH)

    # Chamfer3: one chamfer whose edges measure the first distance from different faces: ONE call of the kernel's chamfer builder (chamfer() names one face for all edges)
    chamfer3_edges_1 = [part.edges().sort_by_distance(p)[0] for p in [
        (95, 25, 2.5),
    ]]
    chamfer3_side_1 = [part.faces().sort_by_distance(p)[0] for p in [
        (83, 25, 2.5),
    ]]
    chamfer3_edges_2 = [part.edges().sort_by_distance(p)[0] for p in [
        (71, 25, 2.5),
        (71, -25, 2.5),
    ]]
    chamfer3_edges_3 = [part.edges().sort_by_distance(p)[0] for p in [
        (71, 43, 2.5),
    ]]
    chamfer3_side_3 = [part.faces().sort_by_distance(p)[0] for p in [
        (83, 34, 2.5),
    ]]
    chamfer3_edges_4 = [part.edges().sort_by_distance(p)[0] for p in [
        (71, -43, 2.5),
    ]]
    chamfer3_side_4 = [part.faces().sort_by_distance(p)[0] for p in [
        (71, -34, 2.5),
    ]]
    chamfer3_edges_5 = [part.edges().sort_by_distance(p)[0] for p in [
        (95, -25, 2.5),
    ]]
    chamfer3_side_5 = [part.faces().sort_by_distance(p)[0] for p in [
        (83, -34, 2.5),
    ]]
    chamfer3 = BRepFilletAPI_MakeChamfer(part.part.solid().wrapped)
    for e in chamfer3_edges_1:
        chamfer3.Add(CHAMFER3_SIZE, CHAMFER3_SIZE2, e.wrapped, chamfer3_side_1[0].wrapped)  # the first distance lies on this face
    for e in chamfer3_edges_2:
        chamfer3.Add(CHAMFER3_SIZE, e.wrapped)
    for e in chamfer3_edges_3:
        chamfer3.Add(CHAMFER3_SIZE, CHAMFER3_SIZE2, e.wrapped, chamfer3_side_3[0].wrapped)  # the first distance lies on this face
    for e in chamfer3_edges_4:
        chamfer3.Add(CHAMFER3_SIZE, CHAMFER3_SIZE2, e.wrapped, chamfer3_side_4[0].wrapped)  # the first distance lies on this face
    for e in chamfer3_edges_5:
        chamfer3.Add(CHAMFER3_SIZE, CHAMFER3_SIZE2, e.wrapped, chamfer3_side_5[0].wrapped)  # the first distance lies on this face
    add(Compound.cast(chamfer3.Shape()), mode=Mode.REPLACE)

    # Sketch10 → Cut-Extrude3 (cut)
    with BuildSketch(Plane.XY.offset(5)):
        with Locations((-37.5, -58)):
            Rectangle(SKETCH10_W, SKETCH10_H)
        with Locations((37.5, 58)):
            Rectangle(SKETCH10_W, SKETCH10_H)
    extrude(amount=-CUT_EXTRUDE3_DEPTH, mode=Mode.SUBTRACT)

    # Chamfer4
    chamfer4_edges = [part.edges().sort_by_distance(p)[0] for p in [
        (65, 67, 2.5),
        (-65, 55, 2.5),
        (-65, -67, 2.5),
        (-59, -61, 2.5),
        (-59, -55, 2.5),
        (-16, -55, 2.5),
        (-16, -61, 2.5),
        (59, 61, 2.5),
        (59, 55, 2.5),
        (16, 55, 2.5),
        (16, 61, 2.5),
    ]]
    chamfer(chamfer4_edges, length=CHAMFER4_SIZE)

    # Sketch11 → Boss-Extrude4 (add)
    with BuildSketch(Plane.XY.offset(5)):
        with Locations((46, -52.5)):
            Rectangle(SKETCH11_W, SKETCH11_H)
    extrude(amount=BOSS_EXTRUDE4_DEPTH)

    # Sketch12 → Boss-Extrude5 (add)
    with BuildSketch(Plane(origin=(0, 0, 5), x_dir=(-1, 0, 0), z_dir=(0, 0, -1))):
        with Locations((-46, -52.5)):
            Rectangle(SKETCH12_W, SKETCH12_H)
    extrude(amount=BOSS_EXTRUDE5_DEPTH)

    # Sketch13 → Cut-Extrude4 (cut)
    with BuildSketch(Plane.XY.offset(18).offset(CUT_EXTRUDE4_START)):
        with Locations((33.8, -52.5)):
            Rectangle(SKETCH13_W, SKETCH13_H)
        with Locations((21.6, -52.5)):
            Rectangle(SKETCH13_W, SKETCH13_H)
        with Locations((58.2, -52.5)):
            Rectangle(SKETCH13_W, SKETCH13_H)
        with Locations((46, -52.5)):
            Rectangle(SKETCH13_W, SKETCH13_H)
        with Locations((70.4, -52.5)):
            Rectangle(SKETCH13_W, SKETCH13_H)
    extrude(amount=-CUT_EXTRUDE4_DEPTH, mode=Mode.SUBTRACT)

    # Sketch15 → Cut-Extrude6 (cut)
    with BuildSketch(Plane(origin=(0, 0, 0), x_dir=(-1, 0, 0), z_dir=(0, 0, -1))):
        with Locations((-70.4, -52.5)):
            Circle(SKETCH15_R)
        with Locations((-58.2, -52.5)):
            Circle(SKETCH15_R)
        with Locations((-46, -52.5)):
            Circle(SKETCH15_R)
        with Locations((-33.8, -52.5)):
            Circle(SKETCH15_R)
        with Locations((-21.6, -52.5)):
            Circle(SKETCH15_R)
    extrude(amount=-CUT_EXTRUDE6_DEPTH, mode=Mode.SUBTRACT)

    # Sketch16 → Boss-Extrude6 (add)
    with BuildSketch(Plane(origin=(0, 0, 0), x_dir=(-1, 0, 0), z_dir=(0, 0, -1))):
        Polygon((-13, -65), (-10, -62.5), (-13, -59.5), align=None)
    extrude(amount=-BOSS_EXTRUDE6_DEPTH)

    # Chamfer5
    chamfer5_edges = [part.edges().sort_by_distance(p)[0] for p in [
        (79, -40, 11.5),
        (13, -40, 11.5),
        (13, -65, 11.5),
        (79, -65, 9),
    ]]
    chamfer(chamfer5_edges, length=CHAMFER5_SIZE)


solid = part.part
